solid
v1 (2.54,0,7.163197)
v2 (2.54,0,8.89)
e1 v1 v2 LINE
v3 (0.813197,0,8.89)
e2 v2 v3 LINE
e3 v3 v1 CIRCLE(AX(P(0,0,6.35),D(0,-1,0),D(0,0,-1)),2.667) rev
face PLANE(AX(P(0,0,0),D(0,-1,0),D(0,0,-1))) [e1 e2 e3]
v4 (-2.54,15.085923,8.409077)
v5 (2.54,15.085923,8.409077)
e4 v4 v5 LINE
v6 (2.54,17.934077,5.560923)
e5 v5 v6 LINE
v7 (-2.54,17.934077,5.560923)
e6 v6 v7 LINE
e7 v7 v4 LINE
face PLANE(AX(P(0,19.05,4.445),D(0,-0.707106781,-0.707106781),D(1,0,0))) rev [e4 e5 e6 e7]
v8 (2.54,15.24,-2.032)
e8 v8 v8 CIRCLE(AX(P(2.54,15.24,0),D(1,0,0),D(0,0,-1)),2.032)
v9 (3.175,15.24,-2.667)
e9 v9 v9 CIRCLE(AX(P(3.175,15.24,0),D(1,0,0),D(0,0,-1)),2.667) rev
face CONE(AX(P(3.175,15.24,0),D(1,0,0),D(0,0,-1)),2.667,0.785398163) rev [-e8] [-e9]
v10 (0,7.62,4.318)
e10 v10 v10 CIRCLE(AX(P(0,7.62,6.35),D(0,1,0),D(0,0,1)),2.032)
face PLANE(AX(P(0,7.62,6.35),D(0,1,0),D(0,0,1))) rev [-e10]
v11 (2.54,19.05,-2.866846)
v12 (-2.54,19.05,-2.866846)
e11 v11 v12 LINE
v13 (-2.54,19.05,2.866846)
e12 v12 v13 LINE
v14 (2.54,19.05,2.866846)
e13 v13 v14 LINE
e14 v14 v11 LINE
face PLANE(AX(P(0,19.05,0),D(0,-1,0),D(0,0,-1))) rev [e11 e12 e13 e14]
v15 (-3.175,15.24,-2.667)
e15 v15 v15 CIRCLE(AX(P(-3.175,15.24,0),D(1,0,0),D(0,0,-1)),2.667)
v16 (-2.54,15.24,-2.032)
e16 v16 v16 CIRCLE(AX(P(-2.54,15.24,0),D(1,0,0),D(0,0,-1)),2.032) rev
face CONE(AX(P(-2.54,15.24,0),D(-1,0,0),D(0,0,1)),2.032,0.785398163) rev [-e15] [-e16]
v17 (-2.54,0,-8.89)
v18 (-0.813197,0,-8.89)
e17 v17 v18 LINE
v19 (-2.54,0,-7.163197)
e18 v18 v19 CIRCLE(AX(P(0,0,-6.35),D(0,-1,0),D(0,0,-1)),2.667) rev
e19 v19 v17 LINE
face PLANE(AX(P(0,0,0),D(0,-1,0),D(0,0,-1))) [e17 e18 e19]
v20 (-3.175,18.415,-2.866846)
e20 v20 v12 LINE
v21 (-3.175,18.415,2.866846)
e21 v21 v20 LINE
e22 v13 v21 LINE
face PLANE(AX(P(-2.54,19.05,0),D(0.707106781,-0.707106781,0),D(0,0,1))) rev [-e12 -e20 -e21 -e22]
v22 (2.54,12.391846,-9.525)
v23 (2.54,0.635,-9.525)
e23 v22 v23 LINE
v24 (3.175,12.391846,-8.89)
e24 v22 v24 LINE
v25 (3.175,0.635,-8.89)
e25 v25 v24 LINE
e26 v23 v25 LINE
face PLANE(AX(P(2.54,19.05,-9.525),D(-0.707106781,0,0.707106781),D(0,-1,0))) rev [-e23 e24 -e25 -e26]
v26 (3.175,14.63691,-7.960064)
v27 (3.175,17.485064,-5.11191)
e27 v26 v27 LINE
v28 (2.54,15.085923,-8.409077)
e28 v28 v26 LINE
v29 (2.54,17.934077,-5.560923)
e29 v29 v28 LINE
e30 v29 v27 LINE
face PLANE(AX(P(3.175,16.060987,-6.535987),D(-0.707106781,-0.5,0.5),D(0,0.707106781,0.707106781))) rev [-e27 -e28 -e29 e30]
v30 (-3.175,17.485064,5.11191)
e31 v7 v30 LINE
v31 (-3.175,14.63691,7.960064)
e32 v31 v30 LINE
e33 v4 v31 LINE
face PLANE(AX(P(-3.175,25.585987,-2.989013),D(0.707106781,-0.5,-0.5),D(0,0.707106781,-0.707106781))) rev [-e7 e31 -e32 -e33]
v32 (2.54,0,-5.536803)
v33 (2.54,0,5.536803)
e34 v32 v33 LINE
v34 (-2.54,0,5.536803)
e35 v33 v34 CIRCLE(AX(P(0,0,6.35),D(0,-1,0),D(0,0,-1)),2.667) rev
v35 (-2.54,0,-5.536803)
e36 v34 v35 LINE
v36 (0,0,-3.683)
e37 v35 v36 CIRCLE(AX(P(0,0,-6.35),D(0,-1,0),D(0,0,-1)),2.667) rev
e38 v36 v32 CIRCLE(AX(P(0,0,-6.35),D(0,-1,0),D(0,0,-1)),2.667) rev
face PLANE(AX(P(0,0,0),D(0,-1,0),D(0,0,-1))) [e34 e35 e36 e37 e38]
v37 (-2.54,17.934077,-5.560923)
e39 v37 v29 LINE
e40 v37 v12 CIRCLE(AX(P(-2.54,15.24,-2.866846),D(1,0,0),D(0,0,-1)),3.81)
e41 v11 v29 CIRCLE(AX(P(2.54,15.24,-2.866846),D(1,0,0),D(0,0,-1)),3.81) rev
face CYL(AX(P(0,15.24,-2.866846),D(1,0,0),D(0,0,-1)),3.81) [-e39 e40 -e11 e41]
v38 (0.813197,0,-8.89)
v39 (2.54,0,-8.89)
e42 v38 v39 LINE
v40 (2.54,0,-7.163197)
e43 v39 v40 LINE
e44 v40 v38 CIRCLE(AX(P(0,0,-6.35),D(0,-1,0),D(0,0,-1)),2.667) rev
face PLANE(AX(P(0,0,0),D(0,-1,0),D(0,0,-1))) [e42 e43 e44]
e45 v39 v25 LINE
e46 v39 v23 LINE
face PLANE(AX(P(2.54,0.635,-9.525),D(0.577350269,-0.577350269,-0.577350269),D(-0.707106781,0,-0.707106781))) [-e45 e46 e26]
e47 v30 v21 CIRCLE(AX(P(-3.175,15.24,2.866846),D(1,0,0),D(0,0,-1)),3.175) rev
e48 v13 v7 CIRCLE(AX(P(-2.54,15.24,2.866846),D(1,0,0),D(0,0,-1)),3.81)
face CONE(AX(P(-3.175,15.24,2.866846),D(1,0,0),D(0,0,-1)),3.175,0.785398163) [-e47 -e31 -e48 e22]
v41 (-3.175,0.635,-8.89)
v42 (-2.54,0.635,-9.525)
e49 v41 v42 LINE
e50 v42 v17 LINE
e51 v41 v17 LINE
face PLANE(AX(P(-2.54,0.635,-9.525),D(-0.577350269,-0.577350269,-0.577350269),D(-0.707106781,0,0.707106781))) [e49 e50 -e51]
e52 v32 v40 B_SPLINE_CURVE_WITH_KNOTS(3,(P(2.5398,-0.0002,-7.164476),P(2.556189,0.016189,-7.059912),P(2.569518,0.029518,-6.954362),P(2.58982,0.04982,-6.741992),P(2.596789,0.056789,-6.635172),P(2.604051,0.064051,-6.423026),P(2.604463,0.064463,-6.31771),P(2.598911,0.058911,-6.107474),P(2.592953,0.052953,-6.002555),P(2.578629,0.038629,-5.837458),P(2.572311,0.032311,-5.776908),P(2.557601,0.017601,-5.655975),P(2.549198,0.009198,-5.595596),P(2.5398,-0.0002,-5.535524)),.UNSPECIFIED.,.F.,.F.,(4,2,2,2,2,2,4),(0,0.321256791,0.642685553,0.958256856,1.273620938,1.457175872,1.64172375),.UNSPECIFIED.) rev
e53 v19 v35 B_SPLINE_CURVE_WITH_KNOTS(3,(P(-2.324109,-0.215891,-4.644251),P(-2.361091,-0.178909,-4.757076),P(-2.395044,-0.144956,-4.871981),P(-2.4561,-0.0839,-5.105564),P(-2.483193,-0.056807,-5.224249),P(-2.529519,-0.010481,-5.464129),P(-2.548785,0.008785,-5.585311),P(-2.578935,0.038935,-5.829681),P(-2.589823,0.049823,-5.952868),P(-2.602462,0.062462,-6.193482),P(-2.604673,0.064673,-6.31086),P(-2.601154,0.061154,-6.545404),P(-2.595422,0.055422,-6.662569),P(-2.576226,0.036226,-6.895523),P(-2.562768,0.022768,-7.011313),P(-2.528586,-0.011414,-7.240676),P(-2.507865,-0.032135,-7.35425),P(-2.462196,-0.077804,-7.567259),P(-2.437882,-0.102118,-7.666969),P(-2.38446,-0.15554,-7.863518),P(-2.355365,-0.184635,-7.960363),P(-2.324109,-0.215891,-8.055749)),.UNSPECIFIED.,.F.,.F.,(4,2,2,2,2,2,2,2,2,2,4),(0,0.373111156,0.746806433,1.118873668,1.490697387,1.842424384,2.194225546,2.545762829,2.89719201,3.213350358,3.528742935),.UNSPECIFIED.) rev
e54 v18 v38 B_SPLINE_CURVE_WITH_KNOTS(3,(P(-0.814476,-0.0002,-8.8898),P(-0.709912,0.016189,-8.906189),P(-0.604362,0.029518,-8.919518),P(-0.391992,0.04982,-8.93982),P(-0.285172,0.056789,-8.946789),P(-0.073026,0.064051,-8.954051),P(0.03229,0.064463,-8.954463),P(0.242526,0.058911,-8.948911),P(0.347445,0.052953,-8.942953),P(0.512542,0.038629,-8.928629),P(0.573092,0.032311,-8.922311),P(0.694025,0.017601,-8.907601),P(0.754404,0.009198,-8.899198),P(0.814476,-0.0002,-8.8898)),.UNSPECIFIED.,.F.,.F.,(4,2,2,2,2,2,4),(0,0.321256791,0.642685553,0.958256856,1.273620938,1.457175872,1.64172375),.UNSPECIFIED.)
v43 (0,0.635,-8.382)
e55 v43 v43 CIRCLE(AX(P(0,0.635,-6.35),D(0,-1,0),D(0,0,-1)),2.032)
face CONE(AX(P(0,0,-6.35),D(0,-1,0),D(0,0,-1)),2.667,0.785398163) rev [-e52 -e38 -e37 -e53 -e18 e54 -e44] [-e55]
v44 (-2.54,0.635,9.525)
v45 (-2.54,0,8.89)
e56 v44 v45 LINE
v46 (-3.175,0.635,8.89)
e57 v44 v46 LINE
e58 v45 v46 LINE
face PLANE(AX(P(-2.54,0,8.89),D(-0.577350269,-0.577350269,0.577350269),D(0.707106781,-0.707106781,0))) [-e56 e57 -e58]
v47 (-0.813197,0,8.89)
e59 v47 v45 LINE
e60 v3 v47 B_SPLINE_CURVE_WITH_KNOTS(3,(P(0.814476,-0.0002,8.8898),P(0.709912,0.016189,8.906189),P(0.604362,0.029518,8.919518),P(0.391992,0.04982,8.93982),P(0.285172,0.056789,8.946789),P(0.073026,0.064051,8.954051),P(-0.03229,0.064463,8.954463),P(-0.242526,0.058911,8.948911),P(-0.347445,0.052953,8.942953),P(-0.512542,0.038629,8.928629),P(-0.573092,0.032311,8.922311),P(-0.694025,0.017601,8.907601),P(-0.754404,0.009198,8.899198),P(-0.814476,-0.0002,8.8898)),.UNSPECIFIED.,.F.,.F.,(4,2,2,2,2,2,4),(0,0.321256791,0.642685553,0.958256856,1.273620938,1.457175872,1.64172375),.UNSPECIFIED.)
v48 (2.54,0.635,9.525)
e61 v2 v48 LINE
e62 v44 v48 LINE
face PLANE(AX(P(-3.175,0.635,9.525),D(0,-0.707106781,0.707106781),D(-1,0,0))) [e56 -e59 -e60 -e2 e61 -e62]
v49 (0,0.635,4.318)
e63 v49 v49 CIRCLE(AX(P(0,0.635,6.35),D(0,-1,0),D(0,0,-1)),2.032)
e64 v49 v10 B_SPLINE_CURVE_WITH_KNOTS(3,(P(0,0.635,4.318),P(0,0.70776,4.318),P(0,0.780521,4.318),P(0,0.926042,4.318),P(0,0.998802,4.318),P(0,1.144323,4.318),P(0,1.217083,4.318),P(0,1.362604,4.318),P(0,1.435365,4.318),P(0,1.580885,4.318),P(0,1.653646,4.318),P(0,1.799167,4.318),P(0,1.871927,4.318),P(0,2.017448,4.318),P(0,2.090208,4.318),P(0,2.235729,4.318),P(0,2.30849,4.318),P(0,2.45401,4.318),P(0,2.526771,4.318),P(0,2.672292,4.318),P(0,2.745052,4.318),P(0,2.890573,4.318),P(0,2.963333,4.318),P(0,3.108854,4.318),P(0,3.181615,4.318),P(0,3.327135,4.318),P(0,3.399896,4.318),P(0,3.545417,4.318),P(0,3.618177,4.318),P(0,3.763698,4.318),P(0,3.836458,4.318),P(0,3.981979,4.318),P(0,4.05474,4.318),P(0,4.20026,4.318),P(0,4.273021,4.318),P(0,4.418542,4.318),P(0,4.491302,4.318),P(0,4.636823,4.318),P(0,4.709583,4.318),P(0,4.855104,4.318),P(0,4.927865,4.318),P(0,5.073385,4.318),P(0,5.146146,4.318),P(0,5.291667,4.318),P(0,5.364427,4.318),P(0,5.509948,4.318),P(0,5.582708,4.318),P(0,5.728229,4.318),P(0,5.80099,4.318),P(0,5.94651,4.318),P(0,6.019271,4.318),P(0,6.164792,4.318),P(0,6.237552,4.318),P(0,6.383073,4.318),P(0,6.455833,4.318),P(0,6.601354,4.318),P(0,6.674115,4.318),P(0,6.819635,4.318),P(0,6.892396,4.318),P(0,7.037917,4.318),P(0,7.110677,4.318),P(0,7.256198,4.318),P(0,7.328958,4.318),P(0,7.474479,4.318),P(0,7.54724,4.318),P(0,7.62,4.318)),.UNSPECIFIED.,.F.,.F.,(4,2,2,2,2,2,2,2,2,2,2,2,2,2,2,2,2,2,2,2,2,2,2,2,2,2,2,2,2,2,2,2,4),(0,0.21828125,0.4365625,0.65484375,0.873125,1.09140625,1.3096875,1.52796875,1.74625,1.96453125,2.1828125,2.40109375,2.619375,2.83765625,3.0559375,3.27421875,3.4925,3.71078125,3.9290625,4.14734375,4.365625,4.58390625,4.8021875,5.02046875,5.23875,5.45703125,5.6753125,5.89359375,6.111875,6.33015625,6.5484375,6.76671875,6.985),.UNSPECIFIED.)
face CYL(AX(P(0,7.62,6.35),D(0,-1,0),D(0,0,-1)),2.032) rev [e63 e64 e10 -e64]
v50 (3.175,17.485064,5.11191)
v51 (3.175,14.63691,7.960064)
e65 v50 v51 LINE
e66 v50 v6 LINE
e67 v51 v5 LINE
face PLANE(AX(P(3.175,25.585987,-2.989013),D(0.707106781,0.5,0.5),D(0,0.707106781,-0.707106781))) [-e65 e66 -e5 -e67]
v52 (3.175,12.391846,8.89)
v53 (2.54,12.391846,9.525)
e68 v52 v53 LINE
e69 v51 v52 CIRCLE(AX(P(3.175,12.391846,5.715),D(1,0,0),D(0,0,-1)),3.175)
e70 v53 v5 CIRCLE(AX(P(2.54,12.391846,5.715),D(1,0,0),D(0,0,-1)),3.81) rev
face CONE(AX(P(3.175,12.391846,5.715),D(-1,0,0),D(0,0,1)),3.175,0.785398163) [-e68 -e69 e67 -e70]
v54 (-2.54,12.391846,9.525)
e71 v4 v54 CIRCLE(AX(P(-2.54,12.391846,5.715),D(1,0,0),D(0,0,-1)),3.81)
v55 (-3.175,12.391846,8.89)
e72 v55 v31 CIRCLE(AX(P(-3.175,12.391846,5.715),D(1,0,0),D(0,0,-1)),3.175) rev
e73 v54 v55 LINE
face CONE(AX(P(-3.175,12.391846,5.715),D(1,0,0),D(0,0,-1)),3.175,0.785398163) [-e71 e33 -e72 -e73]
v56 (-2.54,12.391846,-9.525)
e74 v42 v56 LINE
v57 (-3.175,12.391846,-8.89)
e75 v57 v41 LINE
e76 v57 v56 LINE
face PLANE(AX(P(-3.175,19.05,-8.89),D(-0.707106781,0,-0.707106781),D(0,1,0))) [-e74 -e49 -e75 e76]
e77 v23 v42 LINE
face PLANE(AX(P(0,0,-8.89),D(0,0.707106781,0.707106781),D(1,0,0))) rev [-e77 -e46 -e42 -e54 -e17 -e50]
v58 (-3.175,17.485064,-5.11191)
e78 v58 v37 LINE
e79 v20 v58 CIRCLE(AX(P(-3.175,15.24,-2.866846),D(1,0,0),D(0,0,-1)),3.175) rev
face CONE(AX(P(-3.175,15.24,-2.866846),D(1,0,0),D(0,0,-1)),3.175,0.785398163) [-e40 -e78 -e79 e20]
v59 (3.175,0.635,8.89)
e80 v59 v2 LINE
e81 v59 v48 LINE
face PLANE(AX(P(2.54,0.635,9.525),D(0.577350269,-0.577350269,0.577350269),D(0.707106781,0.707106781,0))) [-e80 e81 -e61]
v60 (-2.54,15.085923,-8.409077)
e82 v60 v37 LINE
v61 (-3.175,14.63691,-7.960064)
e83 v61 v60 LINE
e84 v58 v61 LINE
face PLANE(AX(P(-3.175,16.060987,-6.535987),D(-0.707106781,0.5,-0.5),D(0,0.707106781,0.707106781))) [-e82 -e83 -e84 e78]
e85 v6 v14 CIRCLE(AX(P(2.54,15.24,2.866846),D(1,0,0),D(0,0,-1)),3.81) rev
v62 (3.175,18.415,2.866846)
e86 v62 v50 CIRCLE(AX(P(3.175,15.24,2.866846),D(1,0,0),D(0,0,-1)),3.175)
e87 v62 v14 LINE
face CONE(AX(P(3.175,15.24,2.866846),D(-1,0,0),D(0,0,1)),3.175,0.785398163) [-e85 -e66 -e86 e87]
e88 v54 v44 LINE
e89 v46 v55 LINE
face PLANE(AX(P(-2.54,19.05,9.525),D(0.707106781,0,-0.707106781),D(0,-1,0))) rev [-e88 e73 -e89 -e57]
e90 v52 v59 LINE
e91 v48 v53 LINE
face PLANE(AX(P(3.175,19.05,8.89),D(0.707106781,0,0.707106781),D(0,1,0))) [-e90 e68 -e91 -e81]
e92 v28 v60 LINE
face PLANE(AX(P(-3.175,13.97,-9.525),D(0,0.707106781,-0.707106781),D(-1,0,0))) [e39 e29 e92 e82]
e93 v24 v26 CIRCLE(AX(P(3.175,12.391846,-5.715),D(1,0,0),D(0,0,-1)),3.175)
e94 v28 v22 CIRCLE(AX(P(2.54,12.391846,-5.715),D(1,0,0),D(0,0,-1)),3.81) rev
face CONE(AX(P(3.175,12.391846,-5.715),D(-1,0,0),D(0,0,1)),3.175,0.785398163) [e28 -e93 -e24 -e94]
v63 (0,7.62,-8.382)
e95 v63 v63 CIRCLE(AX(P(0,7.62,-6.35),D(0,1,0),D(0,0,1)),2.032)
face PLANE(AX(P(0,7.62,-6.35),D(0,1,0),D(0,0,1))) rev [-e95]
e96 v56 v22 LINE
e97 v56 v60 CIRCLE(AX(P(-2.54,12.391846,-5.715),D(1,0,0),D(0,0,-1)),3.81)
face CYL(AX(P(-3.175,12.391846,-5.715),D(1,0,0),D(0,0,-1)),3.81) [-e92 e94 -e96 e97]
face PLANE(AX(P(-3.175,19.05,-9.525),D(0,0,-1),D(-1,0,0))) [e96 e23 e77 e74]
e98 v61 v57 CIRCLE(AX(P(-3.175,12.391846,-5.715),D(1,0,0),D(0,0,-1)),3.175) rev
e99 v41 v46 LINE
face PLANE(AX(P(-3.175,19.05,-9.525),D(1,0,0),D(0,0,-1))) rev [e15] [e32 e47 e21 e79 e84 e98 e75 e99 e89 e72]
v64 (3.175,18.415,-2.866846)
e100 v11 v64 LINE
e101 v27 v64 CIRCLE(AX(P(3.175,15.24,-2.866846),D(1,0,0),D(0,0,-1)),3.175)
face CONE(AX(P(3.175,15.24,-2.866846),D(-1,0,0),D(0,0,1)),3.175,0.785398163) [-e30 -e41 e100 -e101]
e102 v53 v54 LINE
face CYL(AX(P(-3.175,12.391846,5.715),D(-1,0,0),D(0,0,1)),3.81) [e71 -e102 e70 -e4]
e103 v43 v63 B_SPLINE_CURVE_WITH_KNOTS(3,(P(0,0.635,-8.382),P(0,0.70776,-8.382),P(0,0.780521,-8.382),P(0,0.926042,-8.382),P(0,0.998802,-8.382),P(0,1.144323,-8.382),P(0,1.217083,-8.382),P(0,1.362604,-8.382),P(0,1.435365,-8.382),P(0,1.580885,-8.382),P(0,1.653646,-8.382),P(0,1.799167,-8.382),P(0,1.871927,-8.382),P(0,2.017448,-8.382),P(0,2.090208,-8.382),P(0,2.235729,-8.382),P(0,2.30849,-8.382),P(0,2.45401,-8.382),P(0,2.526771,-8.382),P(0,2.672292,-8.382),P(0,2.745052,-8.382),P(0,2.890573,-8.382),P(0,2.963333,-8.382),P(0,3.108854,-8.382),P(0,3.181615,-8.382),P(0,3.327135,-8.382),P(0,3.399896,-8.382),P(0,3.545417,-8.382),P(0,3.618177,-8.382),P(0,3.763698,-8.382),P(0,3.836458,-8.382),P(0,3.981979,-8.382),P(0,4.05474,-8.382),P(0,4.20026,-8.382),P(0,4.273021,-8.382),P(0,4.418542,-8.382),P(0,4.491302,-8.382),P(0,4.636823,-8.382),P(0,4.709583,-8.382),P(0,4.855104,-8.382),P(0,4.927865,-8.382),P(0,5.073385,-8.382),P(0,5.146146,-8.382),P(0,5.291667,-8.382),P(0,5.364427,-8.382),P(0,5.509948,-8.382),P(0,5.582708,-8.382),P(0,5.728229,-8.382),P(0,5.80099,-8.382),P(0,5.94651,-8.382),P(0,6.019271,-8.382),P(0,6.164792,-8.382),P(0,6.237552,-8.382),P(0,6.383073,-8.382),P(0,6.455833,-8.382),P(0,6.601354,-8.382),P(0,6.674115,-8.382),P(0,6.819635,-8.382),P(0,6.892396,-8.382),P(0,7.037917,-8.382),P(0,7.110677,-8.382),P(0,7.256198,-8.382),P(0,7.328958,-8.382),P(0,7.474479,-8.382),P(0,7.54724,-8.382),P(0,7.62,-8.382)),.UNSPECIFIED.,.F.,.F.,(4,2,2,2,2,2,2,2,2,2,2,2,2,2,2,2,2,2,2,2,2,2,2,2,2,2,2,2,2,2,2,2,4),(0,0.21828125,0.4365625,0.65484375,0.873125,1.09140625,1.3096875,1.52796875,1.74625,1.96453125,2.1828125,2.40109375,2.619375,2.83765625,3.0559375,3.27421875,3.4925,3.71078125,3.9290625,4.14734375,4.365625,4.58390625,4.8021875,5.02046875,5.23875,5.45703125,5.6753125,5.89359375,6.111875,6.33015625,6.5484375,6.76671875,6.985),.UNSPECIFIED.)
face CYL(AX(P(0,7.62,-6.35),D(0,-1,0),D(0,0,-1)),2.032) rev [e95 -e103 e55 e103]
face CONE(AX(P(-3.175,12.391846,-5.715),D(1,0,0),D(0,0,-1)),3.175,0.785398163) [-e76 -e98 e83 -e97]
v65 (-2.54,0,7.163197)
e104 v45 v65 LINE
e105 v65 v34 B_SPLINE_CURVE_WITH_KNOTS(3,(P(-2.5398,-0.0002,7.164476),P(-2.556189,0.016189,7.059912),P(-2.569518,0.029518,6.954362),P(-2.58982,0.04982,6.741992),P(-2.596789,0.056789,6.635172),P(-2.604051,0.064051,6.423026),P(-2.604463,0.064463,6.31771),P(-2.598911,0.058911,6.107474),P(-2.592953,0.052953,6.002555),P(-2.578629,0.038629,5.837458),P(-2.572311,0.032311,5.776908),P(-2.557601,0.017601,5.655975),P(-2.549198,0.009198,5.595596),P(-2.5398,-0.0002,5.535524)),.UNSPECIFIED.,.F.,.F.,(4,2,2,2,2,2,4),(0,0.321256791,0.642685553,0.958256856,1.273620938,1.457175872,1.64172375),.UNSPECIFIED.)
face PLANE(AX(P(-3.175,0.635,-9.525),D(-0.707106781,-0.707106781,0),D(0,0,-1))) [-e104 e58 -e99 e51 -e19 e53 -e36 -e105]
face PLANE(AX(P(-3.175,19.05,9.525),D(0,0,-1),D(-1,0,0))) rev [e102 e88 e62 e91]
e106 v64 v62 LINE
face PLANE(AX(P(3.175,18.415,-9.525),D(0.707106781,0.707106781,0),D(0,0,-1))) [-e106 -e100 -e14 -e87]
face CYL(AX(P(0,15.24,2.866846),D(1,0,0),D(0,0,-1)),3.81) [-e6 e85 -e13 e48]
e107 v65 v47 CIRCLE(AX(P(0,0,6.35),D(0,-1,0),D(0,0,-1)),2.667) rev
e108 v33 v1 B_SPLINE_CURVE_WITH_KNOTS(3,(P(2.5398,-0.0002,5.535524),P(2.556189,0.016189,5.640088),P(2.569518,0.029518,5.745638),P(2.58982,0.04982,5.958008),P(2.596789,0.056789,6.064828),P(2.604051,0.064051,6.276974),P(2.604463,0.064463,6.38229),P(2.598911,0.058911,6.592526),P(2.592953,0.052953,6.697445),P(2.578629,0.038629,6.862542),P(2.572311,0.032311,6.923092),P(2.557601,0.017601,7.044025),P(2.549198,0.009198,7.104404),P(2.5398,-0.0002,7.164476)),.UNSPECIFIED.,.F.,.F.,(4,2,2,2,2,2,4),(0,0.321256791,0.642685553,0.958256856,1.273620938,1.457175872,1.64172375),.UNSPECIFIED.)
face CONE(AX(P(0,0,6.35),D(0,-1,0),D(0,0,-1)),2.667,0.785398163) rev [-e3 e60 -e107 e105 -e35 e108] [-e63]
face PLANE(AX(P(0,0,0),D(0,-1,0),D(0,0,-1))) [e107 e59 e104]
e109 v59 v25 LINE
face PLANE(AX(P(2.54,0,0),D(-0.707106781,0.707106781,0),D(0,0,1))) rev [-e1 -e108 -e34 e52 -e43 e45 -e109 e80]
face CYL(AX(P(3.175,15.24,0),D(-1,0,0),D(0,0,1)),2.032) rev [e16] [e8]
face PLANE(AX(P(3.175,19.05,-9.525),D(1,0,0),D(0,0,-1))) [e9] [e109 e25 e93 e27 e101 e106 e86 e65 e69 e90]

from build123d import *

# Parameters (mm, degrees)
SKETCH1_W           = 6.35
SKETCH1_H           = 19.05
BOSS_EXTRUDE1_DEPTH = 19.05
SKETCH2_R           = 2.032
CUT_EXTRUDE1_DEPTH  = 23.225
SKETCH1_3_R         = 2.032
CUT_EXTRUDE2_DEPTH  = 7.62
CHAMFER1_SIZE       = 5.08
FILLET1_R           = 3.81


with BuildPart() as part:
    # Sketch1 → Boss-Extrude1 (new body)
    with BuildSketch(Plane(origin=(0, 0, 0), x_dir=(1, 0, 0), z_dir=(0, 1, 0))):
        Rectangle(SKETCH1_W, SKETCH1_H)
    extrude(amount=BOSS_EXTRUDE1_DEPTH)

    # Sketch2 → Cut-Extrude1 (cut, through all)
    with BuildSketch(Plane.ZY.offset(3.175)):
        with Locations((0, 15.24)):
            Circle(SKETCH2_R)
    extrude(amount=-CUT_EXTRUDE1_DEPTH, mode=Mode.SUBTRACT)

    # Sketch1<3> → Cut-Extrude2 (cut)
    with BuildSketch(Plane(origin=(0, 0, 0), x_dir=(1, 0, 0), z_dir=(0, 1, 0))):
        with Locations(Location((0, 6.35, 0), (0, 0, 90))):
            Circle(SKETCH1_3_R)
        with Locations(Location((0, -6.35, 0), (0, 0, 90))):
            Circle(SKETCH1_3_R)
    extrude(amount=CUT_EXTRUDE2_DEPTH, mode=Mode.SUBTRACT)

    # Chamfer1
    chamfer1_edges = [part.edges().sort_by_distance(p)[0] for p in [
        (0, 19.05, 9.525),
        (0, 19.05, -9.525),
    ]]
    chamfer(chamfer1_edges, length=CHAMFER1_SIZE)

    # Fillet1
    fillet1_edges = [part.edges().sort_by_distance(p)[0] for p in [
        (0, 19.05, -4.445),
        (0, 19.05, 4.445),
        (0, 13.97, 9.525),
        (0, 13.97, -9.525),
    ]]
    fillet(fillet1_edges, radius=FILLET1_R)

    # Chamfer2
    # the kernel refuses this chamfer: 0.635 mm, written as the material it takes off along each edge
    with BuildSketch(Plane(origin=(2.751666667, 0.423333333, 9.101666667), x_dir=(0.7071067811865476, 0.7071067811865474, 0), z_dir=(0.5773502691896255, -0.5773502691896256, 0.5773502691896261)), Plane(origin=(-2.751666667, 0.423333333, 9.101666667), x_dir=(0.7071067811865476, -0.7071067811865474, 0), z_dir=(-0.5773502691896257, -0.5773502691896258, 0.5773502691896257))) as chamfer2_piece_1:
        Polygon((-0.449012806, -0.259237664), (0.449012806, -0.259237664), (0, 0.518475329), align=None)
    extrude(amount=0.806558326, mode=Mode.SUBTRACT)
    with BuildSketch(Plane(origin=(-2.751666667, 0.423333333, -9.101666667), x_dir=(-0.7071067811865476, 0, 0.7071067811865476), z_dir=(-0.5773502691896258, -0.5773502691896255, -0.5773502691896258)), Plane(origin=(2.751666667, 0.423333333, -9.101666667), x_dir=(0, -0.7071067811865477, 0.7071067811865474), z_dir=(0.5773502691896258, -0.5773502691896255, -0.5773502691896258))) as chamfer2_piece_2:
        Polygon((-0.449012806, 0.259237664), (0.449012806, 0.259237664), (0, -0.518475329), align=None)
    extrude(amount=0.806558326, mode=Mode.SUBTRACT)
    with BuildSketch(Plane(origin=(3.175, 15.24, 0), x_dir=(0, 0, 1), z_dir=(0, -1, 0))) as chamfer2_piece_3:
        with BuildLine():
            Line((2.684960512, -0.017960512), (2.014039488, 0.652960512))
            Line((2.014039488, 0.652960512), (2.001339488, 0.652960512))
            ThreePointArc((2.001339488, 0.652960512), (2.0193, 0.326480256), (2.0193, 0))
            Line((2.0193, 0), (2.032, -0.0127))
            ThreePointArc((2.032, -0.0127), (2.358480256, -0.0127), (2.684960512, -0.030660512))
            Line((2.684960512, -0.030660512), (2.684960512, -0.017960512))
        make_face()
    revolve(axis=Axis((3.175, 15.24, 0), (-1, 0, 0)), mode=Mode.SUBTRACT)
    with BuildSketch(Plane(origin=(-3.175, 15.24, 0), x_dir=(0, 0, 1), z_dir=(0, -1, 0))) as chamfer2_piece_4:
        with BuildLine():
            Line((2.684960512, 0.017960512), (2.014039488, -0.652960512))
            Line((2.014039488, -0.652960512), (2.001339488, -0.652960512))
            ThreePointArc((2.001339488, -0.652960512), (2.0193, -0.326480256), (2.0193, 0))
            Line((2.0193, 0), (2.032, 0.0127))
            ThreePointArc((2.032, 0.0127), (2.358480256, 0.0127), (2.684960512, 0.030660512))
            Line((2.684960512, 0.030660512), (2.684960512, 0.017960512))
        make_face()
    revolve(axis=Axis((-3.175, 15.24, 0), (-1, 0, 0)), mode=Mode.SUBTRACT)
    with BuildSketch(Plane(origin=(0, 0, -6.35), x_dir=(0, 0, -1), z_dir=(1, 0, 0))) as chamfer2_piece_5:
        with BuildLine():
            Line((2.684960512, -0.017960512), (2.014039488, 0.652960512))
            Line((2.014039488, 0.652960512), (2.001339488, 0.652960512))
            ThreePointArc((2.001339488, 0.652960512), (2.0193, 0.326480256), (2.0193, 0))
            Line((2.0193, 0), (2.032, -0.0127))
            ThreePointArc((2.032, -0.0127), (2.358480256, -0.0127), (2.684960512, -0.030660512))
            Line((2.684960512, -0.030660512), (2.684960512, -0.017960512))
        make_face()
    revolve(axis=Axis((0, 0, -6.35), (0, 1, 0)), mode=Mode.SUBTRACT)
    with BuildSketch(Plane(origin=(0, 0, 6.35), x_dir=(0, 0, -1), z_dir=(1, 0, 0))) as chamfer2_piece_6:
        with BuildLine():
            Line((2.684960512, -0.017960512), (2.014039488, 0.652960512))
            Line((2.014039488, 0.652960512), (2.001339488, 0.652960512))
            ThreePointArc((2.001339488, 0.652960512), (2.0193, 0.326480256), (2.0193, 0))
            Line((2.0193, 0), (2.032, -0.0127))
            ThreePointArc((2.032, -0.0127), (2.358480256, -0.0127), (2.684960512, -0.030660512))
            Line((2.684960512, -0.030660512), (2.684960512, -0.017960512))
        make_face()
    revolve(axis=Axis((0, 0, 6.35), (0, 1, 0)), mode=Mode.SUBTRACT)
    with BuildSketch(Plane(origin=(3.175, -1.633018697, 9.525), x_dir=(0.027495876610586664, 0, -0.9996219169112968), z_dir=(0, 1, 0)), Plane(origin=(3.175, -1.633018697, -9.525), x_dir=(-0.9996219169112968, 0, -0.027495876610587288), z_dir=(0, 1, 0))) as chamfer2_piece_7:
        with BuildLine():
            Line((0.653207479, 0), (-0.035907443, 0.652219799))
            Line((-0.035907443, 0.652219799), (-0.048602642, 0.651870601))
            ThreePointArc((-0.048602642, 0.651870601), (-0.021672059, 0.326007622), (-0.012695198, -0.000349198))
            Line((-0.012695198, -0.000349198), (0.000349198, -0.012695198))
            ThreePointArc((0.000349198, -0.012695198), (0.326706017, -0.003718338), (0.653556677, -0.012695198))
            Line((0.653556677, -0.012695198), (0.653207479, 0))
        make_face()
    extrude(amount=14.024865025, mode=Mode.SUBTRACT)
    with BuildSketch(Plane(origin=(-3.175, -1.633018697, 9.525), x_dir=(-0.02749587661058659, 0, -0.9996219169112968), z_dir=(0, 1, 0)), Plane(origin=(-3.175, -1.633018697, -9.525), x_dir=(0.9996219169112968, 0, -0.027495876610587288), z_dir=(0, 1, 0))) as chamfer2_piece_8:
        with BuildLine():
            Line((0.653207479, 0), (-0.035907443, -0.652219799))
            Line((-0.035907443, -0.652219799), (-0.048602642, -0.651870601))
            ThreePointArc((-0.048602642, -0.651870601), (-0.021672059, -0.326007622), (-0.012695198, 0.000349198))
            Line((-0.012695198, 0.000349198), (0.000349198, 0.012695198))
            ThreePointArc((0.000349198, 0.012695198), (0.326706017, 0.003718338), (0.653556677, 0.012695198))
            Line((0.653556677, 0.012695198), (0.653207479, 0))
        make_face()
    extrude(amount=14.024865025, mode=Mode.SUBTRACT)
    with BuildSketch(Plane(origin=(-3.175, 17.934076836, 5.560923164), x_dir=(-0.027495876610585324, -0.7068394360706735, -0.7068394360706735), z_dir=(0, -0.7071067811865476, 0.7071067811865476)), Plane(origin=(-3.175, 15.085923164, -8.409076836), x_dir=(-0.027495876610586552, -0.7068394360706735, 0.7068394360706735), z_dir=(0, 0.7071067811865476, 0.7071067811865476))) as chamfer2_piece_9:
        with BuildLine():
            Line((0.653207479, 0), (-0.035907443, 0.652219799))
            Line((-0.035907443, 0.652219799), (-0.048602642, 0.651870601))
            ThreePointArc((-0.048602642, 0.651870601), (-0.021672059, 0.326007622), (-0.012695198, -0.000349198))
            Line((-0.012695198, -0.000349198), (0.000349198, -0.012695198))
            ThreePointArc((0.000349198, -0.012695198), (0.326706017, -0.003718338), (0.653556677, -0.012695198))
            Line((0.653556677, -0.012695198), (0.653207479, 0))
        make_face()
    extrude(amount=4.027897552, mode=Mode.SUBTRACT)
    with BuildSketch(Plane(origin=(-3.175, 19.05, 2.866846327), x_dir=(-0.02749587661058659, -0.9996219169112968, 0), z_dir=(0, 0, -1)), Plane(origin=(3.175, 19.05, -2.866846327), x_dir=(0.02749587661058659, -0.9996219169112968, 0), z_dir=(0, 0, 1))) as chamfer2_piece_10:
        with BuildLine():
            Line((0.653207479, 0), (-0.035907443, -0.652219799))
            Line((-0.035907443, -0.652219799), (-0.048602642, -0.651870601))
            ThreePointArc((-0.048602642, -0.651870601), (-0.021672059, -0.326007622), (-0.012695198, 0.000349198))
            Line((-0.012695198, 0.000349198), (0.000349198, 0.012695198))
            ThreePointArc((0.000349198, 0.012695198), (0.326706017, 0.003718338), (0.653556677, 0.012695198))
            Line((0.653556677, 0.012695198), (0.653207479, 0))
        make_face()
    extrude(amount=5.733692655, mode=Mode.SUBTRACT)
    with BuildSketch(Plane(origin=(-3.175, 15.24, -2.866846327), x_dir=(0, 0.7071067811865476, -0.7071067811865474), z_dir=(0, -0.7071067811865474, -0.7071067811865476))) as chamfer2_piece_11:
        with BuildLine():
            Line((3.157039488, -0.017960512), (3.827960512, 0.652960512))
            Line((3.827960512, 0.652960512), (3.840660512, 0.652960512))
            ThreePointArc((3.840660512, 0.652960512), (3.8227, 0.326480256), (3.8227, 0))
            Line((3.8227, 0), (3.81, -0.0127))
            ThreePointArc((3.81, -0.0127), (3.483519744, -0.0127), (3.157039488, -0.030660512))
            Line((3.157039488, -0.030660512), (3.157039488, -0.017960512))
        make_face()
    revolve(axis=Axis((-3.175, 15.24, -2.866846327), (1, 0, 0)), revolution_arc=45, mode=Mode.SUBTRACT)
    with BuildSketch(Plane(origin=(-3.175, 12.391846327, -5.715), x_dir=(0, 0, -1), z_dir=(0, -1, 0))) as chamfer2_piece_12:
        with BuildLine():
            Line((3.157039488, -0.017960512), (3.827960512, 0.652960512))
            Line((3.827960512, 0.652960512), (3.840660512, 0.652960512))
            ThreePointArc((3.840660512, 0.652960512), (3.8227, 0.326480256), (3.8227, 0))
            Line((3.8227, 0), (3.81, -0.0127))
            ThreePointArc((3.81, -0.0127), (3.483519744, -0.0127), (3.157039488, -0.030660512))
            Line((3.157039488, -0.030660512), (3.157039488, -0.017960512))
        make_face()
    revolve(axis=Axis((-3.175, 12.391846327, -5.715), (1, 0, 0)), revolution_arc=45, mode=Mode.SUBTRACT)
    with BuildSketch(Plane(origin=(-3.175, 15.24, 2.866846327), x_dir=(0, 0.7071067811865476, 0.7071067811865474), z_dir=(0, -0.7071067811865474, 0.7071067811865476))) as chamfer2_piece_13:
        with BuildLine():
            Line((3.157039488, 0.017960512), (3.827960512, -0.652960512))
            Line((3.827960512, -0.652960512), (3.840660512, -0.652960512))
            ThreePointArc((3.840660512, -0.652960512), (3.8227, -0.326480256), (3.8227, 0))
            Line((3.8227, 0), (3.81, 0.0127))
            ThreePointArc((3.81, 0.0127), (3.483519744, 0.0127), (3.157039488, 0.030660512))
            Line((3.157039488, 0.030660512), (3.157039488, 0.017960512))
        make_face()
    revolve(axis=Axis((-3.175, 15.24, 2.866846327), (-1, 0, 0)), revolution_arc=45, mode=Mode.SUBTRACT)
    with BuildSketch(Plane(origin=(-3.175, 12.391846327, 5.715), x_dir=(0, 0, 1), z_dir=(0, -1, 0))) as chamfer2_piece_14:
        with BuildLine():
            Line((3.157039488, 0.017960512), (3.827960512, -0.652960512))
            Line((3.827960512, -0.652960512), (3.840660512, -0.652960512))
            ThreePointArc((3.840660512, -0.652960512), (3.8227, -0.326480256), (3.8227, 0))
            Line((3.8227, 0), (3.81, 0.0127))
            ThreePointArc((3.81, 0.0127), (3.483519744, 0.0127), (3.157039488, 0.030660512))
            Line((3.157039488, 0.030660512), (3.157039488, 0.017960512))
        make_face()
    revolve(axis=Axis((-3.175, 12.391846327, 5.715), (-1, 0, 0)), revolution_arc=45, mode=Mode.SUBTRACT)
    with BuildSketch(Plane(origin=(3.175, 17.934076836, 5.560923164), x_dir=(0.02749587661058674, -0.7068394360706736, -0.7068394360706736), z_dir=(0, -0.7071067811865476, 0.7071067811865476)), Plane(origin=(3.175, 15.085923164, -8.409076836), x_dir=(0.027495876610585872, -0.7068394360706735, 0.7068394360706735), z_dir=(0, 0.7071067811865476, 0.7071067811865476))) as chamfer2_piece_15:
        with BuildLine():
            Line((0.653207479, 0), (-0.035907443, -0.652219799))
            Line((-0.035907443, -0.652219799), (-0.048602642, -0.651870601))
            ThreePointArc((-0.048602642, -0.651870601), (-0.021672059, -0.326007622), (-0.012695198, 0.000349198))
            Line((-0.012695198, 0.000349198), (0.000349198, 0.012695198))
            ThreePointArc((0.000349198, 0.012695198), (0.326706017, 0.003718338), (0.653556677, 0.012695198))
            Line((0.653556677, 0.012695198), (0.653207479, 0))
        make_face()
    extrude(amount=4.027897552, mode=Mode.SUBTRACT)
    with BuildSketch(Plane(origin=(-3.175, 0, 11.158018697), x_dir=(-0.027495876610586605, 0.9996219169112968, 0), z_dir=(0, 0, -1))) as chamfer2_piece_16:
        with BuildLine():
            Line((0.653207479, 0), (-0.035907443, 0.652219799))
            Line((-0.035907443, 0.652219799), (-0.048602642, 0.651870601))
            ThreePointArc((-0.048602642, 0.651870601), (-0.021672059, 0.326007622), (-0.012695198, -0.000349198))
            Line((-0.012695198, -0.000349198), (0.000349198, -0.012695198))
            ThreePointArc((0.000349198, -0.012695198), (0.326706017, -0.003718338), (0.653556677, -0.012695198))
            Line((0.653556677, -0.012695198), (0.653207479, 0))
        make_face()
    extrude(amount=22.316037395, mode=Mode.SUBTRACT)
    with BuildSketch(Plane(origin=(3.175, 15.24, -2.866846327), x_dir=(0, 0.7071067811865476, -0.7071067811865474), z_dir=(0, -0.7071067811865474, -0.7071067811865476))) as chamfer2_piece_17:
        with BuildLine():
            Line((3.157039488, 0.017960512), (3.827960512, -0.652960512))
            Line((3.827960512, -0.652960512), (3.840660512, -0.652960512))
            ThreePointArc((3.840660512, -0.652960512), (3.8227, -0.326480256), (3.8227, 0))
            Line((3.8227, 0), (3.81, 0.0127))
            ThreePointArc((3.81, 0.0127), (3.483519744, 0.0127), (3.157039488, 0.030660512))
            Line((3.157039488, 0.030660512), (3.157039488, 0.017960512))
        make_face()
    revolve(axis=Axis((3.175, 15.24, -2.866846327), (1, 0, 0)), revolution_arc=45, mode=Mode.SUBTRACT)
    with BuildSketch(Plane(origin=(3.175, 12.391846327, -5.715), x_dir=(0, 0, -1), z_dir=(0, -1, 0))) as chamfer2_piece_18:
        with BuildLine():
            Line((3.827960512, -0.652960512), (3.157039488, 0.017960512))
            Line((3.157039488, 0.017960512), (3.157039488, 0.030660512))
            ThreePointArc((3.157039488, 0.030660512), (3.483519744, 0.0127), (3.81, 0.0127))
            Line((3.81, 0.0127), (3.8227, 0))
            ThreePointArc((3.8227, 0), (3.8227, -0.326480256), (3.840660512, -0.652960512))
            Line((3.840660512, -0.652960512), (3.827960512, -0.652960512))
        make_face()
    revolve(axis=Axis((3.175, 12.391846327, -5.715), (1, 0, 0)), revolution_arc=45, mode=Mode.SUBTRACT)
    with BuildSketch(Plane(origin=(3.175, 15.24, 2.866846327), x_dir=(0, 0.7071067811865476, 0.7071067811865474), z_dir=(0, -0.7071067811865474, 0.7071067811865476))) as chamfer2_piece_19:
        with BuildLine():
            Line((3.157039488, -0.017960512), (3.827960512, 0.652960512))
            Line((3.827960512, 0.652960512), (3.840660512, 0.652960512))
            ThreePointArc((3.840660512, 0.652960512), (3.8227, 0.326480256), (3.8227, 0))
            Line((3.8227, 0), (3.81, -0.0127))
            ThreePointArc((3.81, -0.0127), (3.483519744, -0.0127), (3.157039488, -0.030660512))
            Line((3.157039488, -0.030660512), (3.157039488, -0.017960512))
        make_face()
    revolve(axis=Axis((3.175, 15.24, 2.866846327), (-1, 0, 0)), revolution_arc=45, mode=Mode.SUBTRACT)
    with BuildSketch(Plane(origin=(3.175, 12.391846327, 5.715), x_dir=(0, 0, 1), z_dir=(0, -1, 0))) as chamfer2_piece_20:
        with BuildLine():
            Line((3.157039488, -0.017960512), (3.827960512, 0.652960512))
            Line((3.827960512, 0.652960512), (3.840660512, 0.652960512))
            ThreePointArc((3.840660512, 0.652960512), (3.8227, 0.326480256), (3.8227, 0))
            Line((3.8227, 0), (3.81, -0.0127))
            ThreePointArc((3.81, -0.0127), (3.483519744, -0.0127), (3.157039488, -0.030660512))
            Line((3.157039488, -0.030660512), (3.157039488, -0.017960512))
        make_face()
    revolve(axis=Axis((3.175, 12.391846327, 5.715), (-1, 0, 0)), revolution_arc=45, mode=Mode.SUBTRACT)
    with BuildSketch(Plane(origin=(4.808018697, 0, 9.525), x_dir=(0, -0.02749587661058637, -0.9996219169112968), z_dir=(-1, 0, 0))) as chamfer2_piece_21:
        with BuildLine():
            Line((0.653207479, 0), (-0.035907443, -0.652219799))
            Line((-0.035907443, -0.652219799), (-0.048602642, -0.651870601))
            ThreePointArc((-0.048602642, -0.651870601), (-0.021672059, -0.326007622), (-0.012695198, 0.000349198))
            Line((-0.012695198, 0.000349198), (0.000349198, 0.012695198))
            ThreePointArc((0.000349198, 0.012695198), (0.326706017, 0.003718338), (0.653556677, 0.012695198))
            Line((0.653556677, 0.012695198), (0.653207479, 0))
        make_face()
    extrude(amount=9.616037395, mode=Mode.SUBTRACT)
    with BuildSketch(Plane(origin=(3.175, 0, -11.158018697), x_dir=(-0.9996219169112968, -0.02749587661058635, 0), z_dir=(0, 0, 1))) as chamfer2_piece_22:
        with BuildLine():
            Line((0.653207479, 0), (-0.035907443, -0.652219799))
            Line((-0.035907443, -0.652219799), (-0.048602642, -0.651870601))
            ThreePointArc((-0.048602642, -0.651870601), (-0.021672059, -0.326007622), (-0.012695198, 0.000349198))
            Line((-0.012695198, 0.000349198), (0.000349198, 0.012695198))
            ThreePointArc((0.000349198, 0.012695198), (0.326706017, 0.003718338), (0.653556677, 0.012695198))
            Line((0.653556677, 0.012695198), (0.653207479, 0))
        make_face()
    extrude(amount=22.316037395, mode=Mode.SUBTRACT)
    with BuildSketch(Plane(origin=(-4.808018697, 0, -9.525), x_dir=(0, 0.9996219169112966, -0.02749587661058728), z_dir=(1, 0, 0))) as chamfer2_piece_23:
        with BuildLine():
            Line((0.653207479, 0), (-0.035907443, 0.652219799))
            Line((-0.035907443, 0.652219799), (-0.048602642, 0.651870601))
            ThreePointArc((-0.048602642, 0.651870601), (-0.021672059, 0.326007622), (-0.012695198, -0.000349198))
            Line((-0.012695198, -0.000349198), (0.000349198, -0.012695198))
            ThreePointArc((0.000349198, -0.012695198), (0.326706017, -0.003718338), (0.653556677, -0.012695198))
            Line((0.653556677, -0.012695198), (0.653207479, 0))
        make_face()
    extrude(amount=9.616037395, mode=Mode.SUBTRACT)


solid = part.part
